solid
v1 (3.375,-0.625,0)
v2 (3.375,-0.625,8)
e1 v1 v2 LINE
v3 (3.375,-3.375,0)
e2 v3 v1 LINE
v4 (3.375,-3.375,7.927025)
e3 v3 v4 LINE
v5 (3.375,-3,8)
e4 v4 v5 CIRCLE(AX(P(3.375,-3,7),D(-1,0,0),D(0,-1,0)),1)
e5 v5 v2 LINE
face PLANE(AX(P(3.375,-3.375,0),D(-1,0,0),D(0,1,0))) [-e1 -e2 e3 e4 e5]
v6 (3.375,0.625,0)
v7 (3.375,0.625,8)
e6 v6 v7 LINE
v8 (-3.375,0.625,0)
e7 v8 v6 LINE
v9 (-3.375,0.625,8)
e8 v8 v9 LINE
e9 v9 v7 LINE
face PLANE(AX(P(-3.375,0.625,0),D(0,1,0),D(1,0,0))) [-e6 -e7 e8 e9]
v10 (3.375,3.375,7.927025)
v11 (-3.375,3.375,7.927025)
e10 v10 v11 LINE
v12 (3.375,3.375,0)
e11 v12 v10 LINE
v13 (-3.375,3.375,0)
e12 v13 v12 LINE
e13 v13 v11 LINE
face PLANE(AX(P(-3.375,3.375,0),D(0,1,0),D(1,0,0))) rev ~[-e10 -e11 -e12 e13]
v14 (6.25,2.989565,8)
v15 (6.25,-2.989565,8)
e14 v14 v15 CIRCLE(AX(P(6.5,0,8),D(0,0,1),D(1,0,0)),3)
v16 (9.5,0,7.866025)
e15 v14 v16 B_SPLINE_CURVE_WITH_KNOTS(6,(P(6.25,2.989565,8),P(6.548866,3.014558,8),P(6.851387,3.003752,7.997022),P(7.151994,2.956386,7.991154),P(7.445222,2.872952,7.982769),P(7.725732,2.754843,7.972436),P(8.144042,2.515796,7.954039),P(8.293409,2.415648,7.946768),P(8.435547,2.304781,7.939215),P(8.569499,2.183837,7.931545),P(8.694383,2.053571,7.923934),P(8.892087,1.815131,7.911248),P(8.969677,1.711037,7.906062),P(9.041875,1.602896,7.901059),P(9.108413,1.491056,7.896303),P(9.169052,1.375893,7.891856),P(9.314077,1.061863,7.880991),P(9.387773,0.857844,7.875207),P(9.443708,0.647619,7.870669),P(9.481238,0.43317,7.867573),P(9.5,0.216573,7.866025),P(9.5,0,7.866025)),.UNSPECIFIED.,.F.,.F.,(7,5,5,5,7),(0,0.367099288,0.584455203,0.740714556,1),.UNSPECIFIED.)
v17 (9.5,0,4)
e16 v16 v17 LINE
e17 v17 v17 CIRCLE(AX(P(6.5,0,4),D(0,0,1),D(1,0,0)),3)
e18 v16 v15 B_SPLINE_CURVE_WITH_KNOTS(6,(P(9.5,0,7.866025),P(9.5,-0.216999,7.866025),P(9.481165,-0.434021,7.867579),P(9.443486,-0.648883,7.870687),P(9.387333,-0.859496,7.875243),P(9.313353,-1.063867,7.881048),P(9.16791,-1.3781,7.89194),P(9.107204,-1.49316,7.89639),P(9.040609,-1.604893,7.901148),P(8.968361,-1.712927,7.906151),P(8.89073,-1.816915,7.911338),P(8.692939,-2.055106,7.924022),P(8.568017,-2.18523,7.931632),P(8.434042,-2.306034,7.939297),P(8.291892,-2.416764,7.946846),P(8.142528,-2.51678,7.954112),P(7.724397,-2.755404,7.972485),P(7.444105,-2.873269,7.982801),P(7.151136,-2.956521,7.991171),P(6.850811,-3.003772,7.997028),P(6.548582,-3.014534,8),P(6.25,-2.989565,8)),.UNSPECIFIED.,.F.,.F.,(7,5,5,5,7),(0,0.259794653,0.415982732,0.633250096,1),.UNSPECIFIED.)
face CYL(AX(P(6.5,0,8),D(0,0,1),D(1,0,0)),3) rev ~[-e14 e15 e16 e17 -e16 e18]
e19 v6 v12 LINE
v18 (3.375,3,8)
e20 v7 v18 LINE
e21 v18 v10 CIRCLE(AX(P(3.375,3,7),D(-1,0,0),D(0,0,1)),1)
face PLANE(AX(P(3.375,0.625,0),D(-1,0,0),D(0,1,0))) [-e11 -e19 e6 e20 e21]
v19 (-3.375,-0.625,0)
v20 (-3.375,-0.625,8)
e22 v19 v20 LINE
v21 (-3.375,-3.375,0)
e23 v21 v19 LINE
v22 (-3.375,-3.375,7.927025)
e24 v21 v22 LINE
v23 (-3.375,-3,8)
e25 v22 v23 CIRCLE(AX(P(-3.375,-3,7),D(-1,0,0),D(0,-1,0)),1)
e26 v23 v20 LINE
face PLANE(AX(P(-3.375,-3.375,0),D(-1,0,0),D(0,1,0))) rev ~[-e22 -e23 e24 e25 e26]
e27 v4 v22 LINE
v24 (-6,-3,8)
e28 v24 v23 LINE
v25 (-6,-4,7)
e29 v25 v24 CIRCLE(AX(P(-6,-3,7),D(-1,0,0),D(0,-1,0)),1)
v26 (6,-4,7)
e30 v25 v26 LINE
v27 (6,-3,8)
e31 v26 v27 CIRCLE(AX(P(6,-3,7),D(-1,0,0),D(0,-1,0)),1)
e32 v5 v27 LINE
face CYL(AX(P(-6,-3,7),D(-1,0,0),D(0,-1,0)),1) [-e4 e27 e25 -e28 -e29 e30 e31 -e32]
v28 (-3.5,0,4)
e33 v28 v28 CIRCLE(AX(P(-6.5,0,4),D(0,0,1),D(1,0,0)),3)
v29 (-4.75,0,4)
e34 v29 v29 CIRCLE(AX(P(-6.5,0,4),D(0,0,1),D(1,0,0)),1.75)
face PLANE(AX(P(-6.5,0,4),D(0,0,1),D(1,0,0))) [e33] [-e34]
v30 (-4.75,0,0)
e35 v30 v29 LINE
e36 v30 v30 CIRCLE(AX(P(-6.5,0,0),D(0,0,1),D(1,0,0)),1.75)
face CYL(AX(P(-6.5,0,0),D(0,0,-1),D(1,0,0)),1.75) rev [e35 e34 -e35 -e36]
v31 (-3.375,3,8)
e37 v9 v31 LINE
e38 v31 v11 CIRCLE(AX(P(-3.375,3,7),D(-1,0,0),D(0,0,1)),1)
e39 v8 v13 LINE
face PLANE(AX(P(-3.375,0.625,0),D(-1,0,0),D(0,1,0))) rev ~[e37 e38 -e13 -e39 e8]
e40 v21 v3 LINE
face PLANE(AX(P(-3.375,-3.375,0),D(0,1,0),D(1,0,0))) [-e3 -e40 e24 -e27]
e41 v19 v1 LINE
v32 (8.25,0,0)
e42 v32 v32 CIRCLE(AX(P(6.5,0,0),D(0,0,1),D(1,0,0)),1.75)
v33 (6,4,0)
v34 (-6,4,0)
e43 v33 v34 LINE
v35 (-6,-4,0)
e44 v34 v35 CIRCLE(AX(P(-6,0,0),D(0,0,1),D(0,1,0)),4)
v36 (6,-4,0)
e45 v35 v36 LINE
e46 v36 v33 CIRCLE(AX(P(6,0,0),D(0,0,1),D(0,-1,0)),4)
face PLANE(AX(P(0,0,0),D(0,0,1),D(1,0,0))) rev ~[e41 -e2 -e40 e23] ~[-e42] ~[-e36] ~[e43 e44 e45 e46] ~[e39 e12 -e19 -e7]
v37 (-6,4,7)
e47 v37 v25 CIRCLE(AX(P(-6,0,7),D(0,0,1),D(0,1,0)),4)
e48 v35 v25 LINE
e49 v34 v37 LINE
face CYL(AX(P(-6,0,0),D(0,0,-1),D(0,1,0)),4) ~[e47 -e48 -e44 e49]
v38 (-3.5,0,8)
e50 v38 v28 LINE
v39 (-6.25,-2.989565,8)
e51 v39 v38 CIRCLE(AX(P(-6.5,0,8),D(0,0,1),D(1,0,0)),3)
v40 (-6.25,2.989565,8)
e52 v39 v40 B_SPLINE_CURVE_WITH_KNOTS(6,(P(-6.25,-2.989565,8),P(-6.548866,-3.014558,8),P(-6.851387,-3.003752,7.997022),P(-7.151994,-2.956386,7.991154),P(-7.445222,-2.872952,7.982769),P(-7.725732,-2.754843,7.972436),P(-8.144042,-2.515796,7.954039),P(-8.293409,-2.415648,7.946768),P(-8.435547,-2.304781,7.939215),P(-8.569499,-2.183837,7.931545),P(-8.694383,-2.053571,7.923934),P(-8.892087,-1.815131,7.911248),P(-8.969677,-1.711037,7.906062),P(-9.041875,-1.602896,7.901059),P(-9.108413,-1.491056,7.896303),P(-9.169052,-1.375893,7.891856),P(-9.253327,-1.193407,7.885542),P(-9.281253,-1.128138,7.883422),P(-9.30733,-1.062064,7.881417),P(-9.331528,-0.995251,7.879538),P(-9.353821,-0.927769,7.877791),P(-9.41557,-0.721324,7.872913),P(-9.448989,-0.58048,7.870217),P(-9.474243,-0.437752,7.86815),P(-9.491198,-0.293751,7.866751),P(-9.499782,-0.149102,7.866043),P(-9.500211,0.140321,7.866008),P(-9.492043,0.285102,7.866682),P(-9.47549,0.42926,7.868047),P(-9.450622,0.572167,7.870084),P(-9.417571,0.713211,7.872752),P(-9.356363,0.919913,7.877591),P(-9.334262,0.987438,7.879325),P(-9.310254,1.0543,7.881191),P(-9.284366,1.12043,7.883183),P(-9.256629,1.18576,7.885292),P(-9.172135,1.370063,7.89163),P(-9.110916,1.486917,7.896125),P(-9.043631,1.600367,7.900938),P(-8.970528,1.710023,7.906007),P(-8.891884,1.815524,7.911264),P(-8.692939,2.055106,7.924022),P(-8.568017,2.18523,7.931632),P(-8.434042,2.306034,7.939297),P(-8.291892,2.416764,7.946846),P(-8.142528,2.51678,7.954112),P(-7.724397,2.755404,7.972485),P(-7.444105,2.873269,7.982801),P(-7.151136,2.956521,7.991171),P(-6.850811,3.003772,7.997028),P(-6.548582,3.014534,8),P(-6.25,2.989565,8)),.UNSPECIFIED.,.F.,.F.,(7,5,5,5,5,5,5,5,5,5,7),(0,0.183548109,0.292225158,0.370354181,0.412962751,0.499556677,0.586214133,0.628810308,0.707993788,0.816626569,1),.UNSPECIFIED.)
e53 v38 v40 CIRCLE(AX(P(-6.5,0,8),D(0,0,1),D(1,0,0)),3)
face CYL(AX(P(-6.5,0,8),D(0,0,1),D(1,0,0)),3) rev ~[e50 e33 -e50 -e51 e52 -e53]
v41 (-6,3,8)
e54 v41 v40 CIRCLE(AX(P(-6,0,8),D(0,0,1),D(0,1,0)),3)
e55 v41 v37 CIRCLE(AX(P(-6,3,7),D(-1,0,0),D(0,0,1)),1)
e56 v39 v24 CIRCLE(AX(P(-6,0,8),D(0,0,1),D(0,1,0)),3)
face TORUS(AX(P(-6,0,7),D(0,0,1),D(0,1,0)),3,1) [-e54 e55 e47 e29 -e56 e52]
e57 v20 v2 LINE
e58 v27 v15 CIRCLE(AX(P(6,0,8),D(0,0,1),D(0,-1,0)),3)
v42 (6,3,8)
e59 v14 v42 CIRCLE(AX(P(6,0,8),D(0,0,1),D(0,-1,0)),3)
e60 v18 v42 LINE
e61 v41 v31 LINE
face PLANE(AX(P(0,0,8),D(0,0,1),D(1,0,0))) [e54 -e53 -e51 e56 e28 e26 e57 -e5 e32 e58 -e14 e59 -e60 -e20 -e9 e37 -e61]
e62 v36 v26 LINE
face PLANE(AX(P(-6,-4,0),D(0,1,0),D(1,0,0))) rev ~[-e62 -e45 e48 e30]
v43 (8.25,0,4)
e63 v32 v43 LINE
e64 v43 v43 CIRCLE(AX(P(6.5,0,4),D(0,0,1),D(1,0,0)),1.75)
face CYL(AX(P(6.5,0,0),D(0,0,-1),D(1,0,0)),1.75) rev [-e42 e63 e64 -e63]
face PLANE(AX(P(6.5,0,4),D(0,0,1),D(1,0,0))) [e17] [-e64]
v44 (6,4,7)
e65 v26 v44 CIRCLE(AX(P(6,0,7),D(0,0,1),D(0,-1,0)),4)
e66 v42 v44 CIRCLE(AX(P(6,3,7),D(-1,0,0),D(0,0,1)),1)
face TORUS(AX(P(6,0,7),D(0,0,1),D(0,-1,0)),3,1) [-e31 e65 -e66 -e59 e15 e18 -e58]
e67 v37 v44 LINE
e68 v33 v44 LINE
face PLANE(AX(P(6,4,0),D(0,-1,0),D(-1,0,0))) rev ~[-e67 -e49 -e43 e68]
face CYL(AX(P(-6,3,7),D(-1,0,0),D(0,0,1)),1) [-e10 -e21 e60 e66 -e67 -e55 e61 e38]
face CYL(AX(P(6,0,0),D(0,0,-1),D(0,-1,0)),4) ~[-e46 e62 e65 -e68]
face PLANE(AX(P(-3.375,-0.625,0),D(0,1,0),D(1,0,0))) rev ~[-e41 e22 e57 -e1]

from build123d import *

# Parameters (mm, degrees)
F0_W        = 6.75
F0_H        = 2.75
F0_R        = 1.75
F1_DEPTH    = 8
F2_R        = 3
F2_R_2      = 1.75
F3_DEPTH    = 4
F4_T1_DEPTH = 12
F4_T4_ANGLE = 180
F4_T6_ANGLE = 180


# Not quite as in the source:
# - a fillet or chamfer that OpenCascade refuses, or shapes differently, is made with other operations: its cross-section is extruded or revolved along the edge and cut away or added


with BuildPart() as f1:
    # F0 (on Top) → F1 (new body)
    with BuildSketch(Plane.XY):
        with BuildLine():
            ThreePointArc((6, -4), (10, 0), (6, 4))
            Line((6, 4), (-6, 4))
            ThreePointArc((-6, 4), (-10, 0), (-6, -4))
            Line((-6, -4), (6, -4))
        make_face()
        with Locations((0, -2)):
            Rectangle(F0_W, F0_H, mode=Mode.SUBTRACT)
        with Locations((-6.5, 0)):
            Circle(F0_R, mode=Mode.SUBTRACT)
        with Locations((6.5, 0)):
            Circle(F0_R, mode=Mode.SUBTRACT)
        with Locations((0, 2)):
            Rectangle(F0_W, F0_H, mode=Mode.SUBTRACT)
    extrude(amount=F1_DEPTH)

    # F2 (on face) → F3 (cut)
    with BuildSketch(Plane.XY.offset(8)):
        with Locations((-6.5, 0)):
            Circle(F2_R)
        with Locations((-6.5, 0)):
            Circle(F2_R_2, mode=Mode.SUBTRACT)
        with Locations((6.5, 0)):
            Circle(F2_R)
        with Locations((6.5, 0)):
            Circle(F2_R_2, mode=Mode.SUBTRACT)
    extrude(amount=-F3_DEPTH, mode=Mode.SUBTRACT)

    # F4: fillet of radius 1 on 1 edges, made by hand

    # F4_s2 → F4_t1 (cut)
    with BuildSketch(Plane.YZ.offset(-6)):
        with BuildLine():
            ThreePointArc((-4, 7), (-3.7071067812, 7.7071067812), (-3, 8))
            Line((-3, 8), (-4, 8))
            Line((-4, 8), (-4, 7))
        make_face()
        with BuildLine():
            ThreePointArc((3, 8), (3.7071067812, 7.7071067812), (4, 7))
            Line((4, 7), (4, 8))
            Line((4, 8), (3, 8))
        make_face()
    extrude(amount=F4_T1_DEPTH, mode=Mode.SUBTRACT)

    # F4_s3 → F4_t4 (revolve, cut)
    with BuildSketch(Plane.YZ.offset(6)):
        with BuildLine():
            ThreePointArc((-4, 7), (-3.7071067812, 7.7071067812), (-3, 8))
            Line((-3, 8), (-4, 8))
            Line((-4, 8), (-4, 7))
        make_face()
    revolve(axis=Axis((6, 0, 8), (0, 0, 1)), revolution_arc=F4_T4_ANGLE, mode=Mode.SUBTRACT)

    # F4_s5 → F4_t6 (revolve, cut)
    with BuildSketch(Plane.YZ.offset(-6)):
        with BuildLine():
            ThreePointArc((4, 7), (3.7071067812, 7.7071067812), (3, 8))
            Line((3, 8), (4, 8))
            Line((4, 8), (4, 7))
        make_face()
    revolve(axis=Axis((-6, 0, 8), (0, 0, 1)), revolution_arc=F4_T6_ANGLE, mode=Mode.SUBTRACT)


solid = f1.part
